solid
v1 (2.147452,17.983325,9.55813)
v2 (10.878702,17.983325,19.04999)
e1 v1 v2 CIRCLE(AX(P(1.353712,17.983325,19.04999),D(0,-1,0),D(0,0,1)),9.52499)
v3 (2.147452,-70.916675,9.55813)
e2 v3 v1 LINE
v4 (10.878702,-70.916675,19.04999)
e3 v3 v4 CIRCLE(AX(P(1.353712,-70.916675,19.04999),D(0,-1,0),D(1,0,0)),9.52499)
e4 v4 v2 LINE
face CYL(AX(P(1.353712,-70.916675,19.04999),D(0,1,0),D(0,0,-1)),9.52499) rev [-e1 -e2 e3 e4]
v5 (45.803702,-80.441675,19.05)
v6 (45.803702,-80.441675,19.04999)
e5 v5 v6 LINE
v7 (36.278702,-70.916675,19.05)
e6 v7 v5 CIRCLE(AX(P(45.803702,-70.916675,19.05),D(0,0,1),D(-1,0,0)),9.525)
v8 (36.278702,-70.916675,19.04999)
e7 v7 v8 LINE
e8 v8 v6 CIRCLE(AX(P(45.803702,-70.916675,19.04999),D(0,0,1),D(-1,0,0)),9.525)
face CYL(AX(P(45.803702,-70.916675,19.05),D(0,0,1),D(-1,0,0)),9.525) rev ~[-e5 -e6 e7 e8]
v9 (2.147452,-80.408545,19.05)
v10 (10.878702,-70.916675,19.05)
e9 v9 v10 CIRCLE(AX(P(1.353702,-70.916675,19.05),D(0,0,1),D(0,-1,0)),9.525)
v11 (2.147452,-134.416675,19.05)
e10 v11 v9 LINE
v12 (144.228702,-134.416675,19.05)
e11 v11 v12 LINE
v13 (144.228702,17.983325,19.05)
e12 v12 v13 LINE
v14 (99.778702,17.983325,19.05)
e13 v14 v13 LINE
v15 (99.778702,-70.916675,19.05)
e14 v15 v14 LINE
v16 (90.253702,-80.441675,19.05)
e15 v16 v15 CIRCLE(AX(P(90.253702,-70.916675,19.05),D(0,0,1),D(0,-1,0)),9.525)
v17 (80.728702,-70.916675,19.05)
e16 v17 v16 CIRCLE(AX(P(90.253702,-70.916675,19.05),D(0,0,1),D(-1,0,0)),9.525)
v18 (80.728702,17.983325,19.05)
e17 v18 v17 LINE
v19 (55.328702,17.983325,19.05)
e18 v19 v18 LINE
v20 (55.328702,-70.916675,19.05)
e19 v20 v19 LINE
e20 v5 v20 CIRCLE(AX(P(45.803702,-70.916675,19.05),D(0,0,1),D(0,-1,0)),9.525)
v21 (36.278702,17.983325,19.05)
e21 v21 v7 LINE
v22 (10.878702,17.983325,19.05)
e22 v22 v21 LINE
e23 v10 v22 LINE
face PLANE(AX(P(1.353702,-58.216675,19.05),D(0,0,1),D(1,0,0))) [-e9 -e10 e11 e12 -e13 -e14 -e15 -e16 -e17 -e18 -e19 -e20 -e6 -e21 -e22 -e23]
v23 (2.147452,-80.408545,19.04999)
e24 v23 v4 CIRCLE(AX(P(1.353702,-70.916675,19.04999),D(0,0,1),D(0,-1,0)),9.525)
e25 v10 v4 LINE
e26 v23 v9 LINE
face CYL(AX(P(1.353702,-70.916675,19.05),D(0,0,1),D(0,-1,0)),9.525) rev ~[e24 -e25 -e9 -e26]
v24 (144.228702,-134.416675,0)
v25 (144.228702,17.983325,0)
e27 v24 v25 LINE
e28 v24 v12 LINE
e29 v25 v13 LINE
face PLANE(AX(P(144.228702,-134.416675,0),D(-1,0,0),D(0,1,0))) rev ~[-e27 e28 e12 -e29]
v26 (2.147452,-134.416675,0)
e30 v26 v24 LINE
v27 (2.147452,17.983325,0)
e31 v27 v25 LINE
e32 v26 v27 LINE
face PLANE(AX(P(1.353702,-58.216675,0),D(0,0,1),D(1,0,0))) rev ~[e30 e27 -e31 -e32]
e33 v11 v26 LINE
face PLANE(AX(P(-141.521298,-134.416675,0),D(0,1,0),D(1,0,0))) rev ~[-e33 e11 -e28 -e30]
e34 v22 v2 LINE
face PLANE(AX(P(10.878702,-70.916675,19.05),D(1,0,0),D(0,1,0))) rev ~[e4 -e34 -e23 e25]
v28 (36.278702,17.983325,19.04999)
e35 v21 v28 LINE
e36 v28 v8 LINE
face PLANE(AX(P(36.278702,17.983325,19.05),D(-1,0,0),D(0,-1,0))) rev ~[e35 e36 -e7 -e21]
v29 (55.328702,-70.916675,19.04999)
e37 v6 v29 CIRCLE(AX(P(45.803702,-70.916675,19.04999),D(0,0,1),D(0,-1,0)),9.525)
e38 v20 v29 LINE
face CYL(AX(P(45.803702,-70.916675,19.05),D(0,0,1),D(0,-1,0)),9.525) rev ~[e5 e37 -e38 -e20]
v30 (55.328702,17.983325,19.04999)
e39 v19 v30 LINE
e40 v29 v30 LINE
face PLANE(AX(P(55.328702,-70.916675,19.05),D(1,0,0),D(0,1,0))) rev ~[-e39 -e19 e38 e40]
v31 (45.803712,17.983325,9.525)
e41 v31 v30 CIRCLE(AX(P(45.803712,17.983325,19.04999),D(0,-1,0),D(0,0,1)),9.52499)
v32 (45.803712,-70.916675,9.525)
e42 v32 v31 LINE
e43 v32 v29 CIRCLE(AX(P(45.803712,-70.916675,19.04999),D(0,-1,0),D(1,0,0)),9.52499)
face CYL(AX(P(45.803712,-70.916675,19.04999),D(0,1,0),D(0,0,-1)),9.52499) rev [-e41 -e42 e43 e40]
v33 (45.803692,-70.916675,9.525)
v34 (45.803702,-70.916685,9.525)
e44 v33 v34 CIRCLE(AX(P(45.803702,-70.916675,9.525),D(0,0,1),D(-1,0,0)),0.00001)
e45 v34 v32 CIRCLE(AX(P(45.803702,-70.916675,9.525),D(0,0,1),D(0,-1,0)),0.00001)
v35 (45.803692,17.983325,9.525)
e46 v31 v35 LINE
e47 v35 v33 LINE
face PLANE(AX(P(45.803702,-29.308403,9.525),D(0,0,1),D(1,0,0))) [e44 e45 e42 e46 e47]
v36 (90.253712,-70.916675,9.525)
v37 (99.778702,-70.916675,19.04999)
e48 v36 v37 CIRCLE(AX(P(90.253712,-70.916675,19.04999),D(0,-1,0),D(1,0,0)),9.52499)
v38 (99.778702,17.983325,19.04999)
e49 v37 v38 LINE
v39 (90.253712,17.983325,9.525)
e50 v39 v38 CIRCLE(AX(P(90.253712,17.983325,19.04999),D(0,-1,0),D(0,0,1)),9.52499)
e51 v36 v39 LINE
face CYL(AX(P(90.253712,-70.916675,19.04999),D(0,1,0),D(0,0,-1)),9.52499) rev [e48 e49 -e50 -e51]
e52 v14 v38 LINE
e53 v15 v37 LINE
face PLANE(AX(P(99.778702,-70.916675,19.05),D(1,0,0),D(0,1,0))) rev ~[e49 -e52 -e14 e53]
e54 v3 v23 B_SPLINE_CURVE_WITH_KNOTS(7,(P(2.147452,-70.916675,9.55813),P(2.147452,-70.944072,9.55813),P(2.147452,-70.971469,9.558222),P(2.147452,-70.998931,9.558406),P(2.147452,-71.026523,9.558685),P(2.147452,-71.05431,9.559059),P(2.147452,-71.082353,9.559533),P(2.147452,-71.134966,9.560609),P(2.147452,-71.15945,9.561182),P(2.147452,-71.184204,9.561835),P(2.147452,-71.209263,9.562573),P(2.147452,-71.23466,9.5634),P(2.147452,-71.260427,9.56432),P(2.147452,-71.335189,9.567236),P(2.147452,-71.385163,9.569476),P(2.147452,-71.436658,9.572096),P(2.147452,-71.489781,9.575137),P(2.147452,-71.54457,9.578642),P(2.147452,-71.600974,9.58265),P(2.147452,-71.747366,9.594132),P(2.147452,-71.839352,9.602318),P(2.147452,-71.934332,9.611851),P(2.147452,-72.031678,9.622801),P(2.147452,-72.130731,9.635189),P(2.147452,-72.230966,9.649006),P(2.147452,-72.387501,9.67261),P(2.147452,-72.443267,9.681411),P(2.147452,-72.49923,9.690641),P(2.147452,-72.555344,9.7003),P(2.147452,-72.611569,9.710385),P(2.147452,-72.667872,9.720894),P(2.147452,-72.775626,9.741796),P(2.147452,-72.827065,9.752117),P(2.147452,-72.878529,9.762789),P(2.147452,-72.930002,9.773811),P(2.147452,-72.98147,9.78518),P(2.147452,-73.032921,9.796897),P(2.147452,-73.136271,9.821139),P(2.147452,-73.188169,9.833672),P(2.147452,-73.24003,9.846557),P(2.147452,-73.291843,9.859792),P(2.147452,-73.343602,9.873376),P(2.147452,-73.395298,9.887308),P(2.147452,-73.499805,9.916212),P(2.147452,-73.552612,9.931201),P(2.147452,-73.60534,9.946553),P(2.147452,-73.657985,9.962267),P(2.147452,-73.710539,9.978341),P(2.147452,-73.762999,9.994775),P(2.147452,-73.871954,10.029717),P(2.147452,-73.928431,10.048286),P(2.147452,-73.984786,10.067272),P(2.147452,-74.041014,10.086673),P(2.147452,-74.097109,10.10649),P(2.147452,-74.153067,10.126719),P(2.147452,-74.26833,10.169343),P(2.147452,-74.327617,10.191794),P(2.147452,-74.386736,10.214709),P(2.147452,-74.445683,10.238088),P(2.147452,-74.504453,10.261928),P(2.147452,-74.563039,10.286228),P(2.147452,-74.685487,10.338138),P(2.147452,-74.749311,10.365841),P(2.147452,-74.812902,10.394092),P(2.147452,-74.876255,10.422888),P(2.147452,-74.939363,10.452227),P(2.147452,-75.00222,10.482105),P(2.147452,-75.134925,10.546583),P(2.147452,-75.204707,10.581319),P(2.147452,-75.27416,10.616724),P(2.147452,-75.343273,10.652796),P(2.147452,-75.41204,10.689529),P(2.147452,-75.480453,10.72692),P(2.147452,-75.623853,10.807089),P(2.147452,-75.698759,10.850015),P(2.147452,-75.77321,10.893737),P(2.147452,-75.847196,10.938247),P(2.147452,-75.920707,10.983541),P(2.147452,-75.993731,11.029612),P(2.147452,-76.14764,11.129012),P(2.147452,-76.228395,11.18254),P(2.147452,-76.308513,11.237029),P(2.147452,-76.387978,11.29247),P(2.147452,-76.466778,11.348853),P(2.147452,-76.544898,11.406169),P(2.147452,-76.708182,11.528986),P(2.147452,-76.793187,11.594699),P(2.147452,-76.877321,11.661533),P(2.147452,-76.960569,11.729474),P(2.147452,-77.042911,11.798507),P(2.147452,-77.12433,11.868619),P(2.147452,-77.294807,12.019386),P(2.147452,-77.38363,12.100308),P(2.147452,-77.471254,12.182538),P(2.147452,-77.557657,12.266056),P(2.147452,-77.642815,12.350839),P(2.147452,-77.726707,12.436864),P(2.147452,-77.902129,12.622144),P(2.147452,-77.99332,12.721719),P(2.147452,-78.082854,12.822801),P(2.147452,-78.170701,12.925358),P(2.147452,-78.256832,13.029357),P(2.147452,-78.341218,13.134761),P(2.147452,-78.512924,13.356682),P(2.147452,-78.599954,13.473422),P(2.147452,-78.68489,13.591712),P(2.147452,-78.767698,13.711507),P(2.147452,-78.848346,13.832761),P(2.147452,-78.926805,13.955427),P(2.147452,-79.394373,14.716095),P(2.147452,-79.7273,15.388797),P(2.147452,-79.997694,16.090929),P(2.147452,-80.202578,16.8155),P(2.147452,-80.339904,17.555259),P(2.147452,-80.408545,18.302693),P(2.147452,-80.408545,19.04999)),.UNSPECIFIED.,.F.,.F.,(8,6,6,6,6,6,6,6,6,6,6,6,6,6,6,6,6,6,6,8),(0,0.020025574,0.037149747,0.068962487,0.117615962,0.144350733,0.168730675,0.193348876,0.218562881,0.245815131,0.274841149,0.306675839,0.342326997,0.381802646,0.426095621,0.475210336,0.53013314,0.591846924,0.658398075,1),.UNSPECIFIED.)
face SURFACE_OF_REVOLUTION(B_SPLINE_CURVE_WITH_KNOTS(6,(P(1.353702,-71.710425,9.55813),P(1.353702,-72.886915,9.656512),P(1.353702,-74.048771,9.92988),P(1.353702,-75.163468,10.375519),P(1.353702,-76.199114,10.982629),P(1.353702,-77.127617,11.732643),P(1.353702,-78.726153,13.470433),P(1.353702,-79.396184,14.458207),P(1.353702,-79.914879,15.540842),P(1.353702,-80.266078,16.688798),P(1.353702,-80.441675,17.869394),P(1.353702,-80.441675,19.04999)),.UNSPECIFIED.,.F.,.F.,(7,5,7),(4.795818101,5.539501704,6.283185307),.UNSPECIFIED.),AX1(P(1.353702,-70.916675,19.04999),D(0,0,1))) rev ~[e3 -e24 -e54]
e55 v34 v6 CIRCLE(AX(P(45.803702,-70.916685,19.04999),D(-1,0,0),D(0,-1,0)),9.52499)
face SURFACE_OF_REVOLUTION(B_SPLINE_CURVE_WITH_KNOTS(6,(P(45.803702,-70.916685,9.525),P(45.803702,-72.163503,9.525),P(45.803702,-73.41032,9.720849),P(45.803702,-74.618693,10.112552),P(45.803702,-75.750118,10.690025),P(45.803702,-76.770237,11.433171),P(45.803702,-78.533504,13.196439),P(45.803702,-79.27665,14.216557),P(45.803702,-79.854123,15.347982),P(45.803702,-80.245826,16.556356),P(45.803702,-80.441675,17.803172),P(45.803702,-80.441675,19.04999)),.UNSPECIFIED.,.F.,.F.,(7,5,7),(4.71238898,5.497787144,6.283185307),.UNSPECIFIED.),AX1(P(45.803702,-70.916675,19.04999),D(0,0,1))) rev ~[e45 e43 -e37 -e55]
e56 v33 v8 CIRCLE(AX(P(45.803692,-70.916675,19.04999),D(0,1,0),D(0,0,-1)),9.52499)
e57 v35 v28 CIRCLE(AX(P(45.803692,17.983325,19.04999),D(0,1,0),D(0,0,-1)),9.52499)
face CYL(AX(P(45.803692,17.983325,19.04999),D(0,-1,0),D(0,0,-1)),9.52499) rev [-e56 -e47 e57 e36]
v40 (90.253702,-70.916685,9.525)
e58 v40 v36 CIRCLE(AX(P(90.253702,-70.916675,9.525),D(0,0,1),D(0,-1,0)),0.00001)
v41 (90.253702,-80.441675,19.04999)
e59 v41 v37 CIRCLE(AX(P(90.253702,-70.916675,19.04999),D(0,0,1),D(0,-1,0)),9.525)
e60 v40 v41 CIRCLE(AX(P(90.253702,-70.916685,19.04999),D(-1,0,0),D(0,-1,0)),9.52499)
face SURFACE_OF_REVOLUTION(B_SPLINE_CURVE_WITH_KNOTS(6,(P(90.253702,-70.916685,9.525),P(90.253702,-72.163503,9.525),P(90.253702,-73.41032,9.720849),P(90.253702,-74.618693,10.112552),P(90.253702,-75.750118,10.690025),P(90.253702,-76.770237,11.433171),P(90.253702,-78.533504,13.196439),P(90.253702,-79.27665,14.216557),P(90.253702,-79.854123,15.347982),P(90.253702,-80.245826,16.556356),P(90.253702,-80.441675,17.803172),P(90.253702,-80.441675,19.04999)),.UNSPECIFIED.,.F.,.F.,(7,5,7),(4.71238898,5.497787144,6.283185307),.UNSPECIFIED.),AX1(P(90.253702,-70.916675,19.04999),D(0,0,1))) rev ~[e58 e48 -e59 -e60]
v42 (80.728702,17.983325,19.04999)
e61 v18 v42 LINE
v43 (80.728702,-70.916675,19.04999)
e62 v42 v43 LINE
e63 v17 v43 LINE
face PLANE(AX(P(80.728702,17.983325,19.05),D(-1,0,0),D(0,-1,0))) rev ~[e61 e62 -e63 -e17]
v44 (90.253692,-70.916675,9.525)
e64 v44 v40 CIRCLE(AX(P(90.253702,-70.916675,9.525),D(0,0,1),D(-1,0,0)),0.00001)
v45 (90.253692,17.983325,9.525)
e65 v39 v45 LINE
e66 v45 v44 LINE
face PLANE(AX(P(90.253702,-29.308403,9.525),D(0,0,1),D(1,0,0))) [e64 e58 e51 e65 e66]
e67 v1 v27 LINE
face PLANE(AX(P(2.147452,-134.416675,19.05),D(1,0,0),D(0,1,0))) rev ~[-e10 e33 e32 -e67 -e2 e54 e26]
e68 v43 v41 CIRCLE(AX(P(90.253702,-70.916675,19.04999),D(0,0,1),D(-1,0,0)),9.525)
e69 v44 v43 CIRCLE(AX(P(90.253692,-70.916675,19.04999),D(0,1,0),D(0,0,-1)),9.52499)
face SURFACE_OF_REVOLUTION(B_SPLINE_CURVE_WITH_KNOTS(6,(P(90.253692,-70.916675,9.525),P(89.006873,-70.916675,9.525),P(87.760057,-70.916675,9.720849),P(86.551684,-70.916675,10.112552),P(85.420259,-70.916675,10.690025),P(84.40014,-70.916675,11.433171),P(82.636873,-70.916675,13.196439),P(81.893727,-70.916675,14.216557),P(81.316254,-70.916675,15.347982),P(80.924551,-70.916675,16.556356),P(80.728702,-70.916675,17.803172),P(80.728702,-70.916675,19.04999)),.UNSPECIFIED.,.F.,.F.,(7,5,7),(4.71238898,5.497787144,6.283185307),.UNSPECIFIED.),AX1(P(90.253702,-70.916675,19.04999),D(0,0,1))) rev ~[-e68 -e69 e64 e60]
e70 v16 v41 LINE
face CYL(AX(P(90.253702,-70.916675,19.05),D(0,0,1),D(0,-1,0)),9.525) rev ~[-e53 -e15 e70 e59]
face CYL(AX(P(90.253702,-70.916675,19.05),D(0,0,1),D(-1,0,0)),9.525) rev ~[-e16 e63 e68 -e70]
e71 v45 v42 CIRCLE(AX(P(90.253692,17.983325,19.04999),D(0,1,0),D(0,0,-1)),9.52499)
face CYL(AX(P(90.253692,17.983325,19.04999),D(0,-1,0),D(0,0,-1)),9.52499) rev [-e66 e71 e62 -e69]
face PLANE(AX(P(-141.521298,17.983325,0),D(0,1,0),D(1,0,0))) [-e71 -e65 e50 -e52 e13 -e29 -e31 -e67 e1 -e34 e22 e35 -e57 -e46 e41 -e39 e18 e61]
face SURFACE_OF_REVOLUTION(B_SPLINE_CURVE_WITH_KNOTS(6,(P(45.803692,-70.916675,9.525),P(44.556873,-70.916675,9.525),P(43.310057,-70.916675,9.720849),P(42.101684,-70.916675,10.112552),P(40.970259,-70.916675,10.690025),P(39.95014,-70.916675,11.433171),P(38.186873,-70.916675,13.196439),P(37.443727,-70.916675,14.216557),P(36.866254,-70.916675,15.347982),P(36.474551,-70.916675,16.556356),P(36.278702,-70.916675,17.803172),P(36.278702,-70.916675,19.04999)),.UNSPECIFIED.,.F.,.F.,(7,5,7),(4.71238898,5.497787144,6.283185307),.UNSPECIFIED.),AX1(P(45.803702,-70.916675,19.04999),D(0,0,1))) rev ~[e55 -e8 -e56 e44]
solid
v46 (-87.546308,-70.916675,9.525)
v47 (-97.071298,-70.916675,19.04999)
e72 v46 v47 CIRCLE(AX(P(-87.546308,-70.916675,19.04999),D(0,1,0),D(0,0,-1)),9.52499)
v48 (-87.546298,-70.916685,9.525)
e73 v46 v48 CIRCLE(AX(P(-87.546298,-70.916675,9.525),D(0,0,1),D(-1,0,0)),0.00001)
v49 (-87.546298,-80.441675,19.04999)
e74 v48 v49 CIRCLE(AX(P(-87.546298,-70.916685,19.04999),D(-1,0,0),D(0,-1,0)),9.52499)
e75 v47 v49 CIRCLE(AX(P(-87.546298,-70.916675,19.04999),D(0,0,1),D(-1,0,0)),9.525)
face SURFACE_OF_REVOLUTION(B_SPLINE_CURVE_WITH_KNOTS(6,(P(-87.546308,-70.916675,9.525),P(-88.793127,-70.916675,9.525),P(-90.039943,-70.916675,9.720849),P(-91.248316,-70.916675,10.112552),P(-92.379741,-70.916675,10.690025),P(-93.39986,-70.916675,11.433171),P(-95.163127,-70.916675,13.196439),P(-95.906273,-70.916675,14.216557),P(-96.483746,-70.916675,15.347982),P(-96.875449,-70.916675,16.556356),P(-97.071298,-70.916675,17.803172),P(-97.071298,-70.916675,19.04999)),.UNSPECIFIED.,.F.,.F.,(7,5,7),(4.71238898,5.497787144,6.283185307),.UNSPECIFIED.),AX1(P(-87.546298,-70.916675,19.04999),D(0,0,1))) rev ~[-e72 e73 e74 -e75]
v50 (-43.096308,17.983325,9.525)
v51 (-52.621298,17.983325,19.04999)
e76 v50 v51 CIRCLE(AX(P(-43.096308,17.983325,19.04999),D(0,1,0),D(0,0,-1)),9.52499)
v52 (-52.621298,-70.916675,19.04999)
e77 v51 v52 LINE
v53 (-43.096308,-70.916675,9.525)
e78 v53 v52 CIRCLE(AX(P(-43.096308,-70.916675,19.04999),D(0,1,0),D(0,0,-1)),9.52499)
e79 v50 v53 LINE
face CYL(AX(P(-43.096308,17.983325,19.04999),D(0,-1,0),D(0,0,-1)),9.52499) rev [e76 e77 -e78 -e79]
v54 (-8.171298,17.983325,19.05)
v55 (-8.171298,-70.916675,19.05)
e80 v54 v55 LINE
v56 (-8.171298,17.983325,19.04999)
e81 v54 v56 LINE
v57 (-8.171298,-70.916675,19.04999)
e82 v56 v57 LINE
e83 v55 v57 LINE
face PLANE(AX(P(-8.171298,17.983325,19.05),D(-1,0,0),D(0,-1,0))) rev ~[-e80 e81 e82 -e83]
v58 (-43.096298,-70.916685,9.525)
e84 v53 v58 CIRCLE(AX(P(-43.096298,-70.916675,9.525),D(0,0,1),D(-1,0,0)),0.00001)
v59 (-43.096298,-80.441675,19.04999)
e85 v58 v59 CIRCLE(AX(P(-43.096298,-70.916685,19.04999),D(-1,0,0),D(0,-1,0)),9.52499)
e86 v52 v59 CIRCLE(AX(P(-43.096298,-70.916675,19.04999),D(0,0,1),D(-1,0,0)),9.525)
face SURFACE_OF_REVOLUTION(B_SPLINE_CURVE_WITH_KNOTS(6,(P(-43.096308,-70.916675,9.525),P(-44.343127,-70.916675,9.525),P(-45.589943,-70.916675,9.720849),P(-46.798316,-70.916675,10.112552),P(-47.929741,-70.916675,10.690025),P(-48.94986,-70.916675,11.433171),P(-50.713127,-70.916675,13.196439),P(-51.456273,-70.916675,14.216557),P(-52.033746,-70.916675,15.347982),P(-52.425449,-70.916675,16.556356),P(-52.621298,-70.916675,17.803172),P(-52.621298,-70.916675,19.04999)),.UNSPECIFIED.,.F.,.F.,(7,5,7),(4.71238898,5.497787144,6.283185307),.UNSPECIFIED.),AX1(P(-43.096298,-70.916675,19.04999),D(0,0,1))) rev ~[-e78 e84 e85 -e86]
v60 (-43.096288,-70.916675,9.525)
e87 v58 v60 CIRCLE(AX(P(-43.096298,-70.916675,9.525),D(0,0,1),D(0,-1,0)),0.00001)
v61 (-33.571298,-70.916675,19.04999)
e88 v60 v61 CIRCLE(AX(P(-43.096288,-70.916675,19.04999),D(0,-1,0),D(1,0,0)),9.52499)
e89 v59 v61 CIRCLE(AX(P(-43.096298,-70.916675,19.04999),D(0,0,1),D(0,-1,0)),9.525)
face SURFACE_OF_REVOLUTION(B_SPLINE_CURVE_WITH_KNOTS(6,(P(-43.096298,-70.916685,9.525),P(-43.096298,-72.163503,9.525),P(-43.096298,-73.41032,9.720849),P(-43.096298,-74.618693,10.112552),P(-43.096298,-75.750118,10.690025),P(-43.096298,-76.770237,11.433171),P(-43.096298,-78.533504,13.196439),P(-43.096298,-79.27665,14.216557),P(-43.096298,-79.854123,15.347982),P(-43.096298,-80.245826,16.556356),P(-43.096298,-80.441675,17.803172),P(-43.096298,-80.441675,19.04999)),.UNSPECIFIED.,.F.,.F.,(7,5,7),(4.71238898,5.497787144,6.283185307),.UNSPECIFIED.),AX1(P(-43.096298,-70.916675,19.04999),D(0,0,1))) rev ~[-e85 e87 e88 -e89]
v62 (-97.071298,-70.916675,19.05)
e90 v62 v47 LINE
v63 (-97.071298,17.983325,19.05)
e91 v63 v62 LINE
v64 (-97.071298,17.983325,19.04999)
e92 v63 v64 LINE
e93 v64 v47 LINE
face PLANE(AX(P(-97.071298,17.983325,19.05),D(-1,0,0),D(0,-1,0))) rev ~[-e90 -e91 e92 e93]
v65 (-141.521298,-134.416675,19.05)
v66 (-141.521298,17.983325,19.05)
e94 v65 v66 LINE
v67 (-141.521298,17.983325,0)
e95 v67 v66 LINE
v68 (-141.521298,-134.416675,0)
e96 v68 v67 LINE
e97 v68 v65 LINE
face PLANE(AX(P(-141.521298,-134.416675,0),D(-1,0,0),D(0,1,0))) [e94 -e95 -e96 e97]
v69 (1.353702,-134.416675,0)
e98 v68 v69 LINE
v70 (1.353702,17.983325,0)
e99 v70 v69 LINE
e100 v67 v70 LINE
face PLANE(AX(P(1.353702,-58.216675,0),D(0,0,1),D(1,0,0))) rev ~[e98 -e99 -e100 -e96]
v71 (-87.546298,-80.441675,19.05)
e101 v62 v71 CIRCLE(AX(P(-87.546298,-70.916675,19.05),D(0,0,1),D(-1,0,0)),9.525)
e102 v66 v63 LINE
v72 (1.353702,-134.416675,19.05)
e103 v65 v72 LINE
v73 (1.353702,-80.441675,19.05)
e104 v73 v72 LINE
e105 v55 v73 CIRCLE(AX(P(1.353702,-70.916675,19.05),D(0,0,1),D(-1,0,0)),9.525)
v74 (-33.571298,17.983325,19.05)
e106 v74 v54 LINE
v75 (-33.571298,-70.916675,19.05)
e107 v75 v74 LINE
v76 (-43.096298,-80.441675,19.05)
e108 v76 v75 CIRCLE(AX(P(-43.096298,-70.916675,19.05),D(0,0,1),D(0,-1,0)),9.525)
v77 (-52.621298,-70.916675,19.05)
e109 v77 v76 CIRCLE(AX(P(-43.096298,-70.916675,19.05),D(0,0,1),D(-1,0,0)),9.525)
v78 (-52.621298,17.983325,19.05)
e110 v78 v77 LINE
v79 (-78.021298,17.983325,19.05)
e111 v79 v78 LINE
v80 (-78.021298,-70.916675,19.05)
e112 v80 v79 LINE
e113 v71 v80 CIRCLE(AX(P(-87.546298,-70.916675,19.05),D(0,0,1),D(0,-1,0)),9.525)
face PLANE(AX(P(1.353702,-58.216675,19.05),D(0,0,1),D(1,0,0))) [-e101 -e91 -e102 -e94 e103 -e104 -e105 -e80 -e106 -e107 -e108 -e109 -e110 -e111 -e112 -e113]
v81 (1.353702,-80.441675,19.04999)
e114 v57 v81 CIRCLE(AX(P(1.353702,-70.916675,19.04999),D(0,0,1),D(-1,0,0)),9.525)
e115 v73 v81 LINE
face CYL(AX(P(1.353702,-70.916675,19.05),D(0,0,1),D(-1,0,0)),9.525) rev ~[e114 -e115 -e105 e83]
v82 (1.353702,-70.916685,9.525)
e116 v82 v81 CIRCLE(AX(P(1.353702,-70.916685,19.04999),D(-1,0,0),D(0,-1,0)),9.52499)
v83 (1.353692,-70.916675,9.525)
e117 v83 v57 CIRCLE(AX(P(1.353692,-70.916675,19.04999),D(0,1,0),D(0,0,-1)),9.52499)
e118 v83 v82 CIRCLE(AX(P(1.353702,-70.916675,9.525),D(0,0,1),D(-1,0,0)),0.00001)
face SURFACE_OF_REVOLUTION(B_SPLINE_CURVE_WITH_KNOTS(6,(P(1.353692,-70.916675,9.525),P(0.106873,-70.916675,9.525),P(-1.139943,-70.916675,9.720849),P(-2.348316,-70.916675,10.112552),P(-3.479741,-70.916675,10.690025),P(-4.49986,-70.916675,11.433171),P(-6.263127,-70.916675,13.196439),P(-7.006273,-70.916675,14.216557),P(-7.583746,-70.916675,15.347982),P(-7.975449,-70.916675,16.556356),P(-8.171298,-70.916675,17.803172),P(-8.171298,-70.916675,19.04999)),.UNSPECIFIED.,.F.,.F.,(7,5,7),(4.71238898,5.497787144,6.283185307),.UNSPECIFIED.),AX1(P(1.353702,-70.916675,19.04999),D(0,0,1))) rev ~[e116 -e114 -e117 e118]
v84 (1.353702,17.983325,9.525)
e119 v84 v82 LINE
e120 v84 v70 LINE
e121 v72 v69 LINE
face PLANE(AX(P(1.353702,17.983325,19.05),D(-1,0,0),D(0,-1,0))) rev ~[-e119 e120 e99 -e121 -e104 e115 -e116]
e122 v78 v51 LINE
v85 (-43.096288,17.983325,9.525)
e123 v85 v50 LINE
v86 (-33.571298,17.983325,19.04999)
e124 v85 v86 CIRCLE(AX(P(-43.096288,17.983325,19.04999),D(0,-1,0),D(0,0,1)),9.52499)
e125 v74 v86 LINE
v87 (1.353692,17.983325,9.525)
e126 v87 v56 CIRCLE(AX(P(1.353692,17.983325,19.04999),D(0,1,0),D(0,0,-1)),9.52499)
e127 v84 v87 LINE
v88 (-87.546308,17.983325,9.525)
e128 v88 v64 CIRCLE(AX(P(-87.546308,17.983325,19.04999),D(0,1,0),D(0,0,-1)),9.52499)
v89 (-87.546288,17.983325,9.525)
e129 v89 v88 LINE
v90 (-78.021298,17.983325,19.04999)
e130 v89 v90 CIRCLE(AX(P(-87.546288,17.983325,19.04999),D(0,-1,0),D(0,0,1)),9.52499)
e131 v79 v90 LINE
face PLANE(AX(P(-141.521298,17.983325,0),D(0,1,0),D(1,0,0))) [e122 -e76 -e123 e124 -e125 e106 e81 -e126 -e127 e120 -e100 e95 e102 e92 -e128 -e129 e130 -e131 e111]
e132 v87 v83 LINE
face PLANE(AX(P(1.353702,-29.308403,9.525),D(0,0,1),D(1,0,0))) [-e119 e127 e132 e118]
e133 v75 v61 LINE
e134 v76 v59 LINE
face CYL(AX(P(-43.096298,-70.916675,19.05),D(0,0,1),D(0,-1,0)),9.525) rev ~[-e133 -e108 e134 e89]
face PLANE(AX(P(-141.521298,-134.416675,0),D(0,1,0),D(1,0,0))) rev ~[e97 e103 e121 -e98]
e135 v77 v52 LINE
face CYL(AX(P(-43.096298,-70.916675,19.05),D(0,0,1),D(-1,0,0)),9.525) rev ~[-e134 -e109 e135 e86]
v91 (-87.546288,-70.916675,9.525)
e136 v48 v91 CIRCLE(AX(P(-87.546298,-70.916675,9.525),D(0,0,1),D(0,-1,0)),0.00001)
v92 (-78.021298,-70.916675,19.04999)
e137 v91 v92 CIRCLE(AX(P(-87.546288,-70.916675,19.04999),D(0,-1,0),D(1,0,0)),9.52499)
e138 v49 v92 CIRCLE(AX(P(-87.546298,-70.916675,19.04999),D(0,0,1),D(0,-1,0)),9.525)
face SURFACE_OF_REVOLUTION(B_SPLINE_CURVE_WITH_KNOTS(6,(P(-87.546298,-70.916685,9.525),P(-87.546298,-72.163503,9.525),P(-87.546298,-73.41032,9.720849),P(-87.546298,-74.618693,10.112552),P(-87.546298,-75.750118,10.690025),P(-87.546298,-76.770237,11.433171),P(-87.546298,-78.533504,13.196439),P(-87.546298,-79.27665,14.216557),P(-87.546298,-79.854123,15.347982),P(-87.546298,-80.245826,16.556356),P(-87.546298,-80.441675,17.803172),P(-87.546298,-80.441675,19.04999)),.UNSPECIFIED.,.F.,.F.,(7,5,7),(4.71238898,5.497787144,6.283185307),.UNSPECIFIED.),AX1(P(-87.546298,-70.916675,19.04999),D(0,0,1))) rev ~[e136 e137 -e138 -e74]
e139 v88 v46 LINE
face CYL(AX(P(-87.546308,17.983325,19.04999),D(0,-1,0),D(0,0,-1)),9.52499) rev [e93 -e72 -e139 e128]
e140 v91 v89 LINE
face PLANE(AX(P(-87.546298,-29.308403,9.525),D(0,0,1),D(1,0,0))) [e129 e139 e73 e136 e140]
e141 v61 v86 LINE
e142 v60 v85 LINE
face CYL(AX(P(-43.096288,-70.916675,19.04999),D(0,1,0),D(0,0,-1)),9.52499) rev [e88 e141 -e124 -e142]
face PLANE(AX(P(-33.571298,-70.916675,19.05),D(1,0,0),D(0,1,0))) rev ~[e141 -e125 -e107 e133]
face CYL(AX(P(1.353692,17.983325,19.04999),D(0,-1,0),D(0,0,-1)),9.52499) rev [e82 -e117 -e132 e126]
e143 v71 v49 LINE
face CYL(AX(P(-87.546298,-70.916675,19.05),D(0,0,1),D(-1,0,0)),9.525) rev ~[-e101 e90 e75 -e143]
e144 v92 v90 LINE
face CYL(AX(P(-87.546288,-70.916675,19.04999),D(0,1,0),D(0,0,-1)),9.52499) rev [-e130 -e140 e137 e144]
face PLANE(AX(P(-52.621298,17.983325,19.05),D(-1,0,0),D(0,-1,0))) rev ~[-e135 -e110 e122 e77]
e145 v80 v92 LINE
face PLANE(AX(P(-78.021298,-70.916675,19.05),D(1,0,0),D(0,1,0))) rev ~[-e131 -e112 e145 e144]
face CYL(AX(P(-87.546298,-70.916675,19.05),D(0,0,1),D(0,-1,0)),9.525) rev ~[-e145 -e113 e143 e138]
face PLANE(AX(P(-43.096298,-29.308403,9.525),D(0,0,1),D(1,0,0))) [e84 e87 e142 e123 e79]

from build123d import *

# Parameters (mm, degrees)
F0_W     = 285.75
F0_H     = 152.4
F1_DEPTH = 19.05
F3_DEPTH = 9.525
F4_R     = 9.52499
F6_DEPTH = 25.4


# Not quite as in the source:
# - a fillet or chamfer is up to 0.001 mm smaller than in the source, because OpenCascade refuses the exact size


with BuildPart() as f1:
    # F0 (on Top) → F1 (new body)
    with BuildSketch(Plane.XY):
        with Locations((1.3537015766, -58.2166751785)):
            Rectangle(F0_W, F0_H)
    extrude(amount=F1_DEPTH)

    # F2 (on face) → F3 (cut)
    with BuildSketch(Plane.XY.offset(19.05)):
        with BuildLine():
            Line((-78.0212984234, 17.9833248215), (-97.0712984234, 17.9833248215))
            Line((-97.0712984234, 17.9833248215), (-97.0712984234, -70.9166751785))
            ThreePointArc((-97.0712984234, -70.9166751785), (-94.2814905142, -77.6518672693), (-87.5462984234, -80.4416751785))
            ThreePointArc((-87.5462984234, -80.4416751785), (-80.8111063326, -77.6518672693), (-78.0212984234, -70.9166751785))
            Line((-78.0212984234, -70.9166751785), (-78.0212984234, 17.9833248215))
        make_face()
        with BuildLine():
            Line((-33.5712984234, 17.9833248215), (-52.6212984234, 17.9833248215))
            Line((-52.6212984234, 17.9833248215), (-52.6212984234, -70.9166751785))
            ThreePointArc((-52.6212984234, -70.9166751785), (-49.8314905142, -77.6518672693), (-43.0962984234, -80.4416751785))
            ThreePointArc((-43.0962984234, -80.4416751785), (-36.3611063326, -77.6518672693), (-33.5712984234, -70.9166751785))
            Line((-33.5712984234, -70.9166751785), (-33.5712984234, 17.9833248215))
        make_face()
        with BuildLine():
            Line((10.8787015766, 17.9833248215), (-8.1712984234, 17.9833248215))
            Line((-8.1712984234, 17.9833248215), (-8.1712984234, -70.9166751785))
            ThreePointArc((-8.1712984234, -70.9166751785), (-5.3814905142, -77.6518672693), (1.3537015766, -80.4416751785))
            ThreePointArc((1.3537015766, -80.4416751785), (8.0888936674, -77.6518672693), (10.8787015766, -70.9166751785))
            Line((10.8787015766, -70.9166751785), (10.8787015766, 17.9833248215))
        make_face()
        with BuildLine():
            Line((55.3287015766, 17.9833248215), (36.2787015766, 17.9833248215))
            Line((36.2787015766, 17.9833248215), (36.2787015766, -70.9166751785))
            ThreePointArc((36.2787015766, -70.9166751785), (39.0685094858, -77.6518672693), (45.8037015766, -80.4416751785))
            ThreePointArc((45.8037015766, -80.4416751785), (52.5388936674, -77.6518672693), (55.3287015766, -70.9166751785))
            Line((55.3287015766, -70.9166751785), (55.3287015766, 17.9833248215))
        make_face()
        with BuildLine():
            Line((99.7787015766, -70.9166751785), (99.7787015766, 17.9833248215))
            Line((99.7787015766, 17.9833248215), (80.7287015766, 17.9833248215))
            Line((80.7287015766, 17.9833248215), (80.7287015766, -70.9166751785))
            ThreePointArc((80.7287015766, -70.9166751785), (83.5185094858, -77.6518672693), (90.2537015766, -80.4416751785))
            ThreePointArc((90.2537015766, -80.4416751785), (96.9888936674, -77.6518672693), (99.7787015766, -70.9166751785))
        make_face()
    extrude(amount=-F3_DEPTH, mode=Mode.SUBTRACT)

    # F4 (radius 9.525 in the source; OpenCascade refuses exactly that, so slightly less here)
    f4_edges = [f1.edges().sort_by_distance(p)[0] for p in [
        (-87.546298, -80.441675, 9.525),
        (-52.621298, -26.466675, 9.525),
        (-8.171298, -26.466675, 9.525),
        (36.278702, -26.466675, 9.525),
        (80.728702, -26.466675, 9.525),
    ]]
    fillet(f4_edges, radius=F4_R)

    # F5 (on face) → F6 (cut)
    with BuildSketch(Plane.XY.offset(19.05)):
        with BuildLine():
            Line((1.3537015766, 17.9833248215), (1.3537015766, -80.4416751785))
            ThreePointArc((1.3537015766, -80.4416751785), (1.7509221371, -80.4333889404), (2.1474515766, -80.4085446434))
            Line((2.1474515766, -80.4085446434), (2.1474515766, 17.9833248215))
            Line((2.1474515766, 17.9833248215), (1.3537015766, 17.9833248215))
        make_face()
        with BuildLine():
            Line((1.3537015766, -80.4416751785), (1.3537015766, -134.4166751785))
            Line((1.3537015766, -134.4166751785), (2.1474515766, -134.4166751785))
            Line((2.1474515766, -134.4166751785), (2.1474515766, -80.4085446434))
            ThreePointArc((2.1474515766, -80.4085446434), (1.7509221371, -80.4333889404), (1.3537015766, -80.4416751785))
        make_face()
    extrude(amount=-F6_DEPTH, mode=Mode.SUBTRACT)


solid = f1.part
